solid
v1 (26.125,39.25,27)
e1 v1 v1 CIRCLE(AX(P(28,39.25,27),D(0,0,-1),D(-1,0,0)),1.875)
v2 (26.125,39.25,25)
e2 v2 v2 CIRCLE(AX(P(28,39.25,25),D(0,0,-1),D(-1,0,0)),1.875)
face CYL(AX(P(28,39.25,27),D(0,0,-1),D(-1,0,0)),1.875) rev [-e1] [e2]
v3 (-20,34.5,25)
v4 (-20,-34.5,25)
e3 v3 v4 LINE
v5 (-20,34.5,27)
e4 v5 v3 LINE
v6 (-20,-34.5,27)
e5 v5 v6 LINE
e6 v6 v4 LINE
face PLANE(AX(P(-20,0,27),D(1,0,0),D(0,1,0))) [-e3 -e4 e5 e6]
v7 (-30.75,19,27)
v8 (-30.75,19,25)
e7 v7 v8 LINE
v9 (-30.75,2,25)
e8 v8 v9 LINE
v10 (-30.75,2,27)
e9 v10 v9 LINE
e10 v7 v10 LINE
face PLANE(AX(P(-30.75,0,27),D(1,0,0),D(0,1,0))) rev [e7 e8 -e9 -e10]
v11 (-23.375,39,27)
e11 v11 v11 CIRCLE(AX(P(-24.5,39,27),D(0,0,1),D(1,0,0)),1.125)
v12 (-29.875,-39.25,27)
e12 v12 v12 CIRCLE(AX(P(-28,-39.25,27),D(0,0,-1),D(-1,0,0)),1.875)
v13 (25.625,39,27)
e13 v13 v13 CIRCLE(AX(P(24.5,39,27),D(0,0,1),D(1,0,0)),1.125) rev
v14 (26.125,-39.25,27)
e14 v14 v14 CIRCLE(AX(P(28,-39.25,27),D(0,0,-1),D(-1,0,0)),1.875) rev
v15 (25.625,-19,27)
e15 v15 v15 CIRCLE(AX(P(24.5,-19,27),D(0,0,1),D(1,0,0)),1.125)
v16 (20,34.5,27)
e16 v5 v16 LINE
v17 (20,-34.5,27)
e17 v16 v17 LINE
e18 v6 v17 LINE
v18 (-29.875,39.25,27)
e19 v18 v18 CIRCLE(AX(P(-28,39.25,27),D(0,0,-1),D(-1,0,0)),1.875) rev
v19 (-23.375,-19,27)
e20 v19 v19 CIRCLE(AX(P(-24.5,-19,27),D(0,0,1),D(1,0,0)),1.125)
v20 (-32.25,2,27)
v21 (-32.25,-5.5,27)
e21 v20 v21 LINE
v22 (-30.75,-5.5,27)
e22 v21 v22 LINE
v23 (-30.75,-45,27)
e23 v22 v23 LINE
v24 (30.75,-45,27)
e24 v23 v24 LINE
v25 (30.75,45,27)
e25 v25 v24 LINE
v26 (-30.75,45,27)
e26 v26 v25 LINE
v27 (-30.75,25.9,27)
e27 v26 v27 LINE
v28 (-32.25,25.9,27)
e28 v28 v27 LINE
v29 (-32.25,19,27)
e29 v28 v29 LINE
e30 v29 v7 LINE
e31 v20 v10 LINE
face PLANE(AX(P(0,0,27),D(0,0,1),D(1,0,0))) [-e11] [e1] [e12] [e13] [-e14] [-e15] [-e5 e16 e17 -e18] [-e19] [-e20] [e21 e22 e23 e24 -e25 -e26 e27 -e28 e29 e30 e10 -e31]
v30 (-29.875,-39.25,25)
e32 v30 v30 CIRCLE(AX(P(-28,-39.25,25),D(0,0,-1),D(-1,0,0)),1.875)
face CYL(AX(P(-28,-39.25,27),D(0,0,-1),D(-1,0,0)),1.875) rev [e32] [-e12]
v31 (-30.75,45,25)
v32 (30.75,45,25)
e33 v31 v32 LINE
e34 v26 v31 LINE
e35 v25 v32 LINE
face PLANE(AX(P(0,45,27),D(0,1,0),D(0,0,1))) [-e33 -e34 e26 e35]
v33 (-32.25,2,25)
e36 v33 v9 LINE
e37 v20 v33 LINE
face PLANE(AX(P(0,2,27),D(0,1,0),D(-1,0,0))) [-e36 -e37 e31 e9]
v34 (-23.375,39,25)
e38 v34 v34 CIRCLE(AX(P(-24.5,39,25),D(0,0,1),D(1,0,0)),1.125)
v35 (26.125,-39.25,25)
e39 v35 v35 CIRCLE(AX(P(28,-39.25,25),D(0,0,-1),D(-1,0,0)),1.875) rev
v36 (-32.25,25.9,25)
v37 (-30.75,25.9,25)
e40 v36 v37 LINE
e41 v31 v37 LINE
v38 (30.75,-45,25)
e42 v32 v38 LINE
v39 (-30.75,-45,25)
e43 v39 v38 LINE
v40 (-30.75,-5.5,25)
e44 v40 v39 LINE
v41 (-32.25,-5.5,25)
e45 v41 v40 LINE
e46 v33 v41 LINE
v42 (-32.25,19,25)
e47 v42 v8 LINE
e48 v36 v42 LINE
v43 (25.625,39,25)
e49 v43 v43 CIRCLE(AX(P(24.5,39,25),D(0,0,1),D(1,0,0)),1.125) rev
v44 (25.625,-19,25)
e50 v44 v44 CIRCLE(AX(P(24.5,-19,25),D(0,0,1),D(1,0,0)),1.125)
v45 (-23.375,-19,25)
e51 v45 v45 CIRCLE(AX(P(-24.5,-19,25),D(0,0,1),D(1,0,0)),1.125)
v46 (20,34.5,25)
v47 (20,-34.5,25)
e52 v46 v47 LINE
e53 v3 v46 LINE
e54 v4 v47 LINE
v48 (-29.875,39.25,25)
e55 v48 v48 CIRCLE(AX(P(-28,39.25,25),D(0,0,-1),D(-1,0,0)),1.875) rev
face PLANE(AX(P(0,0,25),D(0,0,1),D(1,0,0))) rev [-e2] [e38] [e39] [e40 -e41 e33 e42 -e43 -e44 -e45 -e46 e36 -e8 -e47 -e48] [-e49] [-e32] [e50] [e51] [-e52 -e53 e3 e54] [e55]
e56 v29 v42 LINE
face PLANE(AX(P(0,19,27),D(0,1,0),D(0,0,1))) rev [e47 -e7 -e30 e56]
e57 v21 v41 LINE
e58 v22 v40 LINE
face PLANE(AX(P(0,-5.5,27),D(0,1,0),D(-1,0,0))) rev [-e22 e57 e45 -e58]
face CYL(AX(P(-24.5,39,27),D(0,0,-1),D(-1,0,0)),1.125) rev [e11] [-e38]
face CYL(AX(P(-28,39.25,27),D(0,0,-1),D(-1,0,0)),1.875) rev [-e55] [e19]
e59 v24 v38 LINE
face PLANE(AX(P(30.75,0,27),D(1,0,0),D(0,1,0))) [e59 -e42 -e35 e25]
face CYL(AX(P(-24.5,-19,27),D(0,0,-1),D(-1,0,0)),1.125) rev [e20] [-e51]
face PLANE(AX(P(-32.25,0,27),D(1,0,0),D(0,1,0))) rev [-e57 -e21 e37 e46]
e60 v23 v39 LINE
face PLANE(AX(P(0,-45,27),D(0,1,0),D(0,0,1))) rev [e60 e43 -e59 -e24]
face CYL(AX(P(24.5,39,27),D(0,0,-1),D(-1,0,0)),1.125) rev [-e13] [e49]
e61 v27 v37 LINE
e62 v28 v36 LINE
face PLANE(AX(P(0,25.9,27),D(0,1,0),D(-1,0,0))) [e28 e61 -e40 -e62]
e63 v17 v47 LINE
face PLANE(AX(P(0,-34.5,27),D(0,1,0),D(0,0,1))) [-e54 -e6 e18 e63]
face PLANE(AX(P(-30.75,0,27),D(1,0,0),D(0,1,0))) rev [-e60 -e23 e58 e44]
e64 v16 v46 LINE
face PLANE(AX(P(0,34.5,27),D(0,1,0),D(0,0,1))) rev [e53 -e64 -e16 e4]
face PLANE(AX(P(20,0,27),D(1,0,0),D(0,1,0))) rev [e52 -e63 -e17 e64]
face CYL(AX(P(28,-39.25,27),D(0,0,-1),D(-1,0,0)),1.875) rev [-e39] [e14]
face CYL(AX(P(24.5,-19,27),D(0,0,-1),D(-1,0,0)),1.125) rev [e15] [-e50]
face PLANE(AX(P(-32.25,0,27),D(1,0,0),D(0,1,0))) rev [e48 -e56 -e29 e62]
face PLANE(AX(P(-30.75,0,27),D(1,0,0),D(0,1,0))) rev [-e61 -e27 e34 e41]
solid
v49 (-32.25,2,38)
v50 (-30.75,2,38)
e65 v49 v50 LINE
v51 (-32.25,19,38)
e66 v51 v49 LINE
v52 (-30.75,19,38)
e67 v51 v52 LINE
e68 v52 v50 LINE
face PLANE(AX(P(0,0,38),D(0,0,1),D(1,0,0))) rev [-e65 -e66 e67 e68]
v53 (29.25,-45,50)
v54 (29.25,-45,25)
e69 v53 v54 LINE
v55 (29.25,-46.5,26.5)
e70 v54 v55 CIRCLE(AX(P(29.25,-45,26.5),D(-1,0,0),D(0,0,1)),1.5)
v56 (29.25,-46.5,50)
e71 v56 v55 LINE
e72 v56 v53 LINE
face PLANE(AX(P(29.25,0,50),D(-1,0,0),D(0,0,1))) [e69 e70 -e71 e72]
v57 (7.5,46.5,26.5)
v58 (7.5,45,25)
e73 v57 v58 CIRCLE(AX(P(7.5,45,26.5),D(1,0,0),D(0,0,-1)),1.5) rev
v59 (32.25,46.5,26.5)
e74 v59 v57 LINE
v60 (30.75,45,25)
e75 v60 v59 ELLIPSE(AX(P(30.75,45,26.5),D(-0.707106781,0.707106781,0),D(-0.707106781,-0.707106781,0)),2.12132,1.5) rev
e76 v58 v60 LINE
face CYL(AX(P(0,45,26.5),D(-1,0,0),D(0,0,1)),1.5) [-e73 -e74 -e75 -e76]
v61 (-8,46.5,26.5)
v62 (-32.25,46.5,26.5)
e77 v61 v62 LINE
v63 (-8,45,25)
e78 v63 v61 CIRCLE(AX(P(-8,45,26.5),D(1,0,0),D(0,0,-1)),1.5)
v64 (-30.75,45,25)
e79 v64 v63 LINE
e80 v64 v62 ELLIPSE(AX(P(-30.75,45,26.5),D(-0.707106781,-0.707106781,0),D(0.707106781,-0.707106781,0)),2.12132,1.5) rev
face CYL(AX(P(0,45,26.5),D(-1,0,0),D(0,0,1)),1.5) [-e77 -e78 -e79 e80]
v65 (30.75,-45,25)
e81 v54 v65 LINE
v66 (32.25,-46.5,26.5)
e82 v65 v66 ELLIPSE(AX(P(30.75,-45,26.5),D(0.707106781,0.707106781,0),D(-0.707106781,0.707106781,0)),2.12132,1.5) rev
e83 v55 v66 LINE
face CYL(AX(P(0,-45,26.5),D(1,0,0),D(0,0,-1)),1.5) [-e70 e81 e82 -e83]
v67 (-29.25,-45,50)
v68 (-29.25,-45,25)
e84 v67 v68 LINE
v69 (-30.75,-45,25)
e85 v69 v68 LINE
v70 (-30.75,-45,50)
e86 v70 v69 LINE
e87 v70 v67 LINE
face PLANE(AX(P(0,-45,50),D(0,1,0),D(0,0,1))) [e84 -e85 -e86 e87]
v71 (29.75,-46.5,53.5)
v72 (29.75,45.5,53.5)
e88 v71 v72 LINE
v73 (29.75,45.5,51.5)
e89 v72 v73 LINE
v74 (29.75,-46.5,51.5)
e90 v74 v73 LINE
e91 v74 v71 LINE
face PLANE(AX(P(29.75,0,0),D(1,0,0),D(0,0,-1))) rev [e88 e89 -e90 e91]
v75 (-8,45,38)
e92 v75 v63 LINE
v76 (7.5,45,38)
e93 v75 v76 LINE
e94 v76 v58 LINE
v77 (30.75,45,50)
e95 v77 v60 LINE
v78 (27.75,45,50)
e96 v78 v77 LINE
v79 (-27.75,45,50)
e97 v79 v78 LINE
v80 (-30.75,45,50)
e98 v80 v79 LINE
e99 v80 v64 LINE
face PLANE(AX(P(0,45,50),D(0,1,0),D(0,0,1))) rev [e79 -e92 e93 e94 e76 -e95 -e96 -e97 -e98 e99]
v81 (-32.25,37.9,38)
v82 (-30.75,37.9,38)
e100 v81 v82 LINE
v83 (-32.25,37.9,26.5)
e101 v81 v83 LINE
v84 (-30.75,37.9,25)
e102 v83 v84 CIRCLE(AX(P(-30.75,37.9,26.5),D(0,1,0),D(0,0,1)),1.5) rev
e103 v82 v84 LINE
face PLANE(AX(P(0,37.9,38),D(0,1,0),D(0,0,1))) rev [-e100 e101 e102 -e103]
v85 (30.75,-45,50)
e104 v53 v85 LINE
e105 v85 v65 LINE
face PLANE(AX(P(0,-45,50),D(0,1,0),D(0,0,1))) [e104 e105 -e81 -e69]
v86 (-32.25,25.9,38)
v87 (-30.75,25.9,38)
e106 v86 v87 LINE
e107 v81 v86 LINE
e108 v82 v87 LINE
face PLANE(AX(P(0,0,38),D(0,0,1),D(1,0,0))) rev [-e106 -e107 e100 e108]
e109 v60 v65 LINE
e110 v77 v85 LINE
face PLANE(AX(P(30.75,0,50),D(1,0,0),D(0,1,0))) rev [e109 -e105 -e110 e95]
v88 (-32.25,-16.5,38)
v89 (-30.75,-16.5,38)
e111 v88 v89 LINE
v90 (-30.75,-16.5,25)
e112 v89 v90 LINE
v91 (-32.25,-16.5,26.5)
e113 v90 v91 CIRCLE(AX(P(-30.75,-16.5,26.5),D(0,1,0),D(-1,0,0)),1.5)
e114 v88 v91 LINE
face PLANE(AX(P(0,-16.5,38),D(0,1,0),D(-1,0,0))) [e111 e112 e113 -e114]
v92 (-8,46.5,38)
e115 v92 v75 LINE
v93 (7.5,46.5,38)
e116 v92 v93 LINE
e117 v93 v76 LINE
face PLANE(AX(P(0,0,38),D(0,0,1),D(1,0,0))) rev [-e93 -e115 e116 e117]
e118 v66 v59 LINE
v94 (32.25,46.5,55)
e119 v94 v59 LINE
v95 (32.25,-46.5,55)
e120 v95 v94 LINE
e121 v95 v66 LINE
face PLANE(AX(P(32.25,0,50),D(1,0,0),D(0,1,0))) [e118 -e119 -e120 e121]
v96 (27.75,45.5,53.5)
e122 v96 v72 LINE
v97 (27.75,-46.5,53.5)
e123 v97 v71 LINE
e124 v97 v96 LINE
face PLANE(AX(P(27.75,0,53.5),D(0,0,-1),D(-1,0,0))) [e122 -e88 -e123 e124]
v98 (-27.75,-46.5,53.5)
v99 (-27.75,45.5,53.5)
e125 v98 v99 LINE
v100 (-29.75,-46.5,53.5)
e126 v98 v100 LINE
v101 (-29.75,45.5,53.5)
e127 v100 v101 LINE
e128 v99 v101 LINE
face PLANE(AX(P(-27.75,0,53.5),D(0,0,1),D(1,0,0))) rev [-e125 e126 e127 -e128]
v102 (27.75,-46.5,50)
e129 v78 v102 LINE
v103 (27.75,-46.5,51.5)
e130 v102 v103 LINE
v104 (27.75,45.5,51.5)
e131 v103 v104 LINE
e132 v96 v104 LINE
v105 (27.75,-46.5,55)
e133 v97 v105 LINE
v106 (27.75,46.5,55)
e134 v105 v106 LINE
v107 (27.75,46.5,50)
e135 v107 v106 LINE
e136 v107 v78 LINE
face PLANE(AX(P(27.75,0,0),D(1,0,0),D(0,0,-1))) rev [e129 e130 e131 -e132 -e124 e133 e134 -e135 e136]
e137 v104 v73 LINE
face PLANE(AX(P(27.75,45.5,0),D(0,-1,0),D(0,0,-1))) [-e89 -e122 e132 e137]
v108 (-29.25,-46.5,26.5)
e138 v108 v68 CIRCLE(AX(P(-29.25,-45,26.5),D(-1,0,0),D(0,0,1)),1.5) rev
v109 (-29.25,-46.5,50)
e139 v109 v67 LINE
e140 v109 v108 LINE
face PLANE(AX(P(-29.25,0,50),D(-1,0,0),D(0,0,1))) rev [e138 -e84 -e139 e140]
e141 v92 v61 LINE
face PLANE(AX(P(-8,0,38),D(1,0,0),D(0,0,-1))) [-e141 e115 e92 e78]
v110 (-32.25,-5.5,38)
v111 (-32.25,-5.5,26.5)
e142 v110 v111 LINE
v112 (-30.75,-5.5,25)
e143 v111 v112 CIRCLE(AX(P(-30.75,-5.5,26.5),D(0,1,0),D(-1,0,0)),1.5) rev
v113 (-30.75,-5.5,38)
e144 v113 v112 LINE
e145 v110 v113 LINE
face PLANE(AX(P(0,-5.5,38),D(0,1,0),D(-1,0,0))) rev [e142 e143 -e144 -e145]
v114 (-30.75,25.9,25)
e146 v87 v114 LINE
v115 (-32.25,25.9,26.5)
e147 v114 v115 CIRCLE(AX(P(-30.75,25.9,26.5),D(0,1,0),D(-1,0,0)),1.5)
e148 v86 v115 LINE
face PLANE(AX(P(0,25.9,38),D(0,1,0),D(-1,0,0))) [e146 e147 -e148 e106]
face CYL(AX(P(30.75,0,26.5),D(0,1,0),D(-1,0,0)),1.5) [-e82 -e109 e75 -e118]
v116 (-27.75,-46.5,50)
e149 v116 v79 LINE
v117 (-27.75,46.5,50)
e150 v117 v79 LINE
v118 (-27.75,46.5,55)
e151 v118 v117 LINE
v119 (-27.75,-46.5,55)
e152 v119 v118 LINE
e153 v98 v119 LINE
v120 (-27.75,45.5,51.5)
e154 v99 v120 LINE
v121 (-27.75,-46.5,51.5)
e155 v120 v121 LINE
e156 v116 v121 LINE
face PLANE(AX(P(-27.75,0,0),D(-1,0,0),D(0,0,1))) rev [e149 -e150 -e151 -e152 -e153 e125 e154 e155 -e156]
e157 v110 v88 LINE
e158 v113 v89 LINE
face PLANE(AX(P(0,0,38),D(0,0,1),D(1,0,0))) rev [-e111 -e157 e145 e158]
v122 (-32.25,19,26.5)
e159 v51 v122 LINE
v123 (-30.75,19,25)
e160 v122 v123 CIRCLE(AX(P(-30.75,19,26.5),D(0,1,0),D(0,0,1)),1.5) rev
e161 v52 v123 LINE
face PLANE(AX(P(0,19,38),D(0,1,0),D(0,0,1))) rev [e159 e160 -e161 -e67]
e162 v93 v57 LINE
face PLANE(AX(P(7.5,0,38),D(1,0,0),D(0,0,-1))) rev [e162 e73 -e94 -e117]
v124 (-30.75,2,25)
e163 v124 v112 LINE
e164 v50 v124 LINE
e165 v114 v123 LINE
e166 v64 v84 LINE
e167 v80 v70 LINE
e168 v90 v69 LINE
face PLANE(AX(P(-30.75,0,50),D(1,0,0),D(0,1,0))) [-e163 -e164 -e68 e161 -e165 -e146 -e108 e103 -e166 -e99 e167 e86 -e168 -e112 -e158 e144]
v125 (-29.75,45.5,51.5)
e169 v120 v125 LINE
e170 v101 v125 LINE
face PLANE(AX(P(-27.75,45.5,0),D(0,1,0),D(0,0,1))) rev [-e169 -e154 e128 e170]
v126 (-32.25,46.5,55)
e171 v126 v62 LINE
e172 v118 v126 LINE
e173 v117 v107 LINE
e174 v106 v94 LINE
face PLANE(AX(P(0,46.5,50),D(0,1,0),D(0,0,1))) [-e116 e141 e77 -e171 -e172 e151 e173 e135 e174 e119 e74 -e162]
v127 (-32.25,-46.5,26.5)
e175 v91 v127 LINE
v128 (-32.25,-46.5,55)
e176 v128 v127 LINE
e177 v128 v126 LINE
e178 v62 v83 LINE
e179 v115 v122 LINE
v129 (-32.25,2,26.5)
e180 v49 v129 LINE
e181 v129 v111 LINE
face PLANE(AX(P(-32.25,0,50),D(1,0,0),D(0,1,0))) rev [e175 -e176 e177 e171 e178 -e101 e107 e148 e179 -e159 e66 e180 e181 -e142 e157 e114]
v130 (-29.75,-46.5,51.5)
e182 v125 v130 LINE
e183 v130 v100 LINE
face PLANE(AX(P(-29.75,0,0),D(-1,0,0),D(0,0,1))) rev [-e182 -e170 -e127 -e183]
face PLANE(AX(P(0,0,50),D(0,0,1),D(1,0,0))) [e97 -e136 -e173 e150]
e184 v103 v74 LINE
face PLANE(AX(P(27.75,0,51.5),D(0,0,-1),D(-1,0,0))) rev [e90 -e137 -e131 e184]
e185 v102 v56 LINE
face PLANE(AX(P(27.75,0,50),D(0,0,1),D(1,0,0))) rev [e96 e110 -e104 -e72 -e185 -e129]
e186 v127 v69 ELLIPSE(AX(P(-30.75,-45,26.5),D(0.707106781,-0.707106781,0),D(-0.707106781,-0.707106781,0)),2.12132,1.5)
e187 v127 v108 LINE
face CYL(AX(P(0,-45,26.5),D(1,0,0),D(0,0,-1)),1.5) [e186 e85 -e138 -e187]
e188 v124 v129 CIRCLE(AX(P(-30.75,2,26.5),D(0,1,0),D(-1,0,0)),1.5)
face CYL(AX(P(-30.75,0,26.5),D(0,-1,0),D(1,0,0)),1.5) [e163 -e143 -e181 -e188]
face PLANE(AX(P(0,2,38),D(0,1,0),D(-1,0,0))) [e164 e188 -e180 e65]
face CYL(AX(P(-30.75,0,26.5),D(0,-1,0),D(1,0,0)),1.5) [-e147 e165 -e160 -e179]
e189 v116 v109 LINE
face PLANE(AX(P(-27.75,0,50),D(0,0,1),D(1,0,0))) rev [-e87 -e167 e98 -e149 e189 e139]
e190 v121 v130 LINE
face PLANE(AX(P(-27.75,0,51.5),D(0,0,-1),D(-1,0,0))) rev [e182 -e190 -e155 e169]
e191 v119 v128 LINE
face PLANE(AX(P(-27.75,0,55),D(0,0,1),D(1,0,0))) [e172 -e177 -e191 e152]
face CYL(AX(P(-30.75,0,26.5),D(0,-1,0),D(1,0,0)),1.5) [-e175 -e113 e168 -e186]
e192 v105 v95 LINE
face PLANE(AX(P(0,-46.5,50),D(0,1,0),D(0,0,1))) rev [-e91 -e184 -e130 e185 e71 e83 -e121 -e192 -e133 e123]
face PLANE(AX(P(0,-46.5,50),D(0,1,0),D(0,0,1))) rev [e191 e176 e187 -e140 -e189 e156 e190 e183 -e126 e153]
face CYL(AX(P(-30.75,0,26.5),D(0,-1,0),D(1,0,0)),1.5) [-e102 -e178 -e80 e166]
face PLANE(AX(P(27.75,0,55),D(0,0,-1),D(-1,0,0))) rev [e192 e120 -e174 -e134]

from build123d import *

# Parameters (mm, degrees)
BOSS_EXTRUDE8_START  = 25
SKETCH2_R            = 1.125
SKETCH2_W            = 40
SKETCH2_H            = 69
BOSS_EXTRUDE8_DEPTH  = 2
BOSS_EXTRUDE9_START  = 25
BOSS_EXTRUDE9_DEPTH  = 25
CUT_EXTRUDE5_START   = 25
SKETCH2_9_W          = 1.5
SKETCH2_9_H          = 17
SKETCH2_9_H_2        = 11
SKETCH2_9_H_3        = 12
CUT_EXTRUDE5_DEPTH   = 13
FILLET2_R            = 1.5
BOSS_EXTRUDE10_DEPTH = 4.5
SKETCH3_3_W          = 2
SKETCH3_3_H          = 92
BOSS_EXTRUDE11_DEPTH = 2.5
BOSS_EXTRUDE12_DEPTH = 4.5
SKETCH4_3_W          = 2
SKETCH4_3_H          = 92
BOSS_EXTRUDE13_DEPTH = 2.5
SKETCH5_R            = 1.875
CUT_EXTRUDE6_DEPTH   = 2


with BuildPart() as part:
    # Sketch2 → Boss-Extrude8 (new body)
    with BuildSketch(Plane.XY.offset(BOSS_EXTRUDE8_START)):
        Polygon((-30.75, -45), (30.75, -45), (30.75, 45), (-30.75, 45), (-30.75, 25.9), (-32.25, 25.9), (-32.25, 19), (-30.75, 19), (-30.75, 2), (-32.25, 2), (-32.25, -5.5), (-30.75, -5.5), align=None)
        with Locations((-24.5, -19)):
            Circle(SKETCH2_R, mode=Mode.SUBTRACT)
        Rectangle(SKETCH2_W, SKETCH2_H, mode=Mode.SUBTRACT)
        with Locations((24.5, -19)):
            Circle(SKETCH2_R, mode=Mode.SUBTRACT)
        with Locations((-24.5, 39)):
            Circle(SKETCH2_R, mode=Mode.SUBTRACT)
        with Locations((24.5, 39)):
            Circle(SKETCH2_R, mode=Mode.SUBTRACT)
    extrude(amount=BOSS_EXTRUDE8_DEPTH)

    # Sketch5 → Cut-Extrude6 (cut)
    with BuildSketch(Plane(origin=(0, 0, 25), x_dir=(-1, 0, 0), z_dir=(0, 0, -1))):
        with Locations((-28, 39.25)):
            Circle(SKETCH5_R)
        with Locations((28, 39.25)):
            Circle(SKETCH5_R)
        with Locations((28, -39.25)):
            Circle(SKETCH5_R)
        with Locations((-28, -39.25)):
            Circle(SKETCH5_R)
    extrude(amount=-CUT_EXTRUDE6_DEPTH, mode=Mode.SUBTRACT)


with BuildPart() as body_2:
    # Sketch2<8> → Boss-Extrude9 (new body)
    with BuildSketch(Plane.XY.offset(BOSS_EXTRUDE9_START)):
        Polygon((-32.25, 46.5), (-32.25, -46.5), (-29.25, -46.5), (-29.25, -45), (-30.75, -45), (-30.75, 45), (30.75, 45), (30.75, -45), (29.25, -45), (29.25, -46.5), (32.25, -46.5), (32.25, 46.5), align=None)
    extrude(amount=BOSS_EXTRUDE9_DEPTH)

    # Sketch2<9> → Cut-Extrude5 (cut)
    with BuildSketch(Plane.XY.offset(CUT_EXTRUDE5_START)):
        with Locations((-31.5, 10.5)):
            Rectangle(SKETCH2_9_W, SKETCH2_9_H)
        with Locations((-31.5, -11)):
            Rectangle(SKETCH2_9_W, SKETCH2_9_H_2)
        with Locations((-31.5, 31.9)):
            Rectangle(SKETCH2_9_W, SKETCH2_9_H_3)
        Polygon((-8, 46.5), (-8, 45), (7.5, 45), (7.5, 46.5), (0, 46.5), align=None)
    extrude(amount=CUT_EXTRUDE5_DEPTH, mode=Mode.SUBTRACT)

    # Fillet2
    fillet2_edges = [body_2.edges().sort_by_distance(p)[0] for p in [
        (-30.75, -46.5, 25),
        (30.75, -46.5, 25),
        (32.25, 0, 25),
        (19.875, 46.5, 25),
        (-20.125, 46.5, 25),
        (-32.25, 42.2, 25),
        (-32.25, 22.45, 25),
        (-32.25, -1.75, 25),
        (-32.25, -31.5, 25),
    ]]
    fillet(fillet2_edges, radius=FILLET2_R - 0.0001)  # a hair under: the kernel refuses the full size

    # Sketch3 → Boss-Extrude10 (add)
    with BuildSketch(Plane(origin=(32.25, 0, 0), x_dir=(0, 0, -1), z_dir=(1, 0, 0))):
        Polygon((-51.5, -46.5), (-50, -46.5), (-50, 46.5), (-55, 46.5), (-55, -46.5), (-53.5, -46.5), (-53.5, 45.5), (-51.5, 45.5), align=None)
    extrude(amount=-BOSS_EXTRUDE10_DEPTH)

    # Sketch3<3> → Boss-Extrude11 (add)
    with BuildSketch(Plane(origin=(32.25, 0, 0), x_dir=(0, 0, -1), z_dir=(1, 0, 0))):
        with Locations((-52.5, -0.5)):
            Rectangle(SKETCH3_3_W, SKETCH3_3_H)
    extrude(amount=-BOSS_EXTRUDE11_DEPTH)

    # Sketch4 → Boss-Extrude12 (add)
    with BuildSketch(Plane.ZY.offset(32.25)):
        Polygon((50, 46.5), (50, -46.5), (51.5, -46.5), (51.5, 45.5), (53.5, 45.5), (53.5, -46.5), (55, -46.5), (55, 46.5), align=None)
    extrude(amount=-BOSS_EXTRUDE12_DEPTH)

    # Sketch4<3> → Boss-Extrude13 (add)
    with BuildSketch(Plane.ZY.offset(32.25)):
        with Locations((52.5, -0.5)):
            Rectangle(SKETCH4_3_W, SKETCH4_3_H)
    extrude(amount=-BOSS_EXTRUDE13_DEPTH)


solid = Compound([part.part, body_2.part])
